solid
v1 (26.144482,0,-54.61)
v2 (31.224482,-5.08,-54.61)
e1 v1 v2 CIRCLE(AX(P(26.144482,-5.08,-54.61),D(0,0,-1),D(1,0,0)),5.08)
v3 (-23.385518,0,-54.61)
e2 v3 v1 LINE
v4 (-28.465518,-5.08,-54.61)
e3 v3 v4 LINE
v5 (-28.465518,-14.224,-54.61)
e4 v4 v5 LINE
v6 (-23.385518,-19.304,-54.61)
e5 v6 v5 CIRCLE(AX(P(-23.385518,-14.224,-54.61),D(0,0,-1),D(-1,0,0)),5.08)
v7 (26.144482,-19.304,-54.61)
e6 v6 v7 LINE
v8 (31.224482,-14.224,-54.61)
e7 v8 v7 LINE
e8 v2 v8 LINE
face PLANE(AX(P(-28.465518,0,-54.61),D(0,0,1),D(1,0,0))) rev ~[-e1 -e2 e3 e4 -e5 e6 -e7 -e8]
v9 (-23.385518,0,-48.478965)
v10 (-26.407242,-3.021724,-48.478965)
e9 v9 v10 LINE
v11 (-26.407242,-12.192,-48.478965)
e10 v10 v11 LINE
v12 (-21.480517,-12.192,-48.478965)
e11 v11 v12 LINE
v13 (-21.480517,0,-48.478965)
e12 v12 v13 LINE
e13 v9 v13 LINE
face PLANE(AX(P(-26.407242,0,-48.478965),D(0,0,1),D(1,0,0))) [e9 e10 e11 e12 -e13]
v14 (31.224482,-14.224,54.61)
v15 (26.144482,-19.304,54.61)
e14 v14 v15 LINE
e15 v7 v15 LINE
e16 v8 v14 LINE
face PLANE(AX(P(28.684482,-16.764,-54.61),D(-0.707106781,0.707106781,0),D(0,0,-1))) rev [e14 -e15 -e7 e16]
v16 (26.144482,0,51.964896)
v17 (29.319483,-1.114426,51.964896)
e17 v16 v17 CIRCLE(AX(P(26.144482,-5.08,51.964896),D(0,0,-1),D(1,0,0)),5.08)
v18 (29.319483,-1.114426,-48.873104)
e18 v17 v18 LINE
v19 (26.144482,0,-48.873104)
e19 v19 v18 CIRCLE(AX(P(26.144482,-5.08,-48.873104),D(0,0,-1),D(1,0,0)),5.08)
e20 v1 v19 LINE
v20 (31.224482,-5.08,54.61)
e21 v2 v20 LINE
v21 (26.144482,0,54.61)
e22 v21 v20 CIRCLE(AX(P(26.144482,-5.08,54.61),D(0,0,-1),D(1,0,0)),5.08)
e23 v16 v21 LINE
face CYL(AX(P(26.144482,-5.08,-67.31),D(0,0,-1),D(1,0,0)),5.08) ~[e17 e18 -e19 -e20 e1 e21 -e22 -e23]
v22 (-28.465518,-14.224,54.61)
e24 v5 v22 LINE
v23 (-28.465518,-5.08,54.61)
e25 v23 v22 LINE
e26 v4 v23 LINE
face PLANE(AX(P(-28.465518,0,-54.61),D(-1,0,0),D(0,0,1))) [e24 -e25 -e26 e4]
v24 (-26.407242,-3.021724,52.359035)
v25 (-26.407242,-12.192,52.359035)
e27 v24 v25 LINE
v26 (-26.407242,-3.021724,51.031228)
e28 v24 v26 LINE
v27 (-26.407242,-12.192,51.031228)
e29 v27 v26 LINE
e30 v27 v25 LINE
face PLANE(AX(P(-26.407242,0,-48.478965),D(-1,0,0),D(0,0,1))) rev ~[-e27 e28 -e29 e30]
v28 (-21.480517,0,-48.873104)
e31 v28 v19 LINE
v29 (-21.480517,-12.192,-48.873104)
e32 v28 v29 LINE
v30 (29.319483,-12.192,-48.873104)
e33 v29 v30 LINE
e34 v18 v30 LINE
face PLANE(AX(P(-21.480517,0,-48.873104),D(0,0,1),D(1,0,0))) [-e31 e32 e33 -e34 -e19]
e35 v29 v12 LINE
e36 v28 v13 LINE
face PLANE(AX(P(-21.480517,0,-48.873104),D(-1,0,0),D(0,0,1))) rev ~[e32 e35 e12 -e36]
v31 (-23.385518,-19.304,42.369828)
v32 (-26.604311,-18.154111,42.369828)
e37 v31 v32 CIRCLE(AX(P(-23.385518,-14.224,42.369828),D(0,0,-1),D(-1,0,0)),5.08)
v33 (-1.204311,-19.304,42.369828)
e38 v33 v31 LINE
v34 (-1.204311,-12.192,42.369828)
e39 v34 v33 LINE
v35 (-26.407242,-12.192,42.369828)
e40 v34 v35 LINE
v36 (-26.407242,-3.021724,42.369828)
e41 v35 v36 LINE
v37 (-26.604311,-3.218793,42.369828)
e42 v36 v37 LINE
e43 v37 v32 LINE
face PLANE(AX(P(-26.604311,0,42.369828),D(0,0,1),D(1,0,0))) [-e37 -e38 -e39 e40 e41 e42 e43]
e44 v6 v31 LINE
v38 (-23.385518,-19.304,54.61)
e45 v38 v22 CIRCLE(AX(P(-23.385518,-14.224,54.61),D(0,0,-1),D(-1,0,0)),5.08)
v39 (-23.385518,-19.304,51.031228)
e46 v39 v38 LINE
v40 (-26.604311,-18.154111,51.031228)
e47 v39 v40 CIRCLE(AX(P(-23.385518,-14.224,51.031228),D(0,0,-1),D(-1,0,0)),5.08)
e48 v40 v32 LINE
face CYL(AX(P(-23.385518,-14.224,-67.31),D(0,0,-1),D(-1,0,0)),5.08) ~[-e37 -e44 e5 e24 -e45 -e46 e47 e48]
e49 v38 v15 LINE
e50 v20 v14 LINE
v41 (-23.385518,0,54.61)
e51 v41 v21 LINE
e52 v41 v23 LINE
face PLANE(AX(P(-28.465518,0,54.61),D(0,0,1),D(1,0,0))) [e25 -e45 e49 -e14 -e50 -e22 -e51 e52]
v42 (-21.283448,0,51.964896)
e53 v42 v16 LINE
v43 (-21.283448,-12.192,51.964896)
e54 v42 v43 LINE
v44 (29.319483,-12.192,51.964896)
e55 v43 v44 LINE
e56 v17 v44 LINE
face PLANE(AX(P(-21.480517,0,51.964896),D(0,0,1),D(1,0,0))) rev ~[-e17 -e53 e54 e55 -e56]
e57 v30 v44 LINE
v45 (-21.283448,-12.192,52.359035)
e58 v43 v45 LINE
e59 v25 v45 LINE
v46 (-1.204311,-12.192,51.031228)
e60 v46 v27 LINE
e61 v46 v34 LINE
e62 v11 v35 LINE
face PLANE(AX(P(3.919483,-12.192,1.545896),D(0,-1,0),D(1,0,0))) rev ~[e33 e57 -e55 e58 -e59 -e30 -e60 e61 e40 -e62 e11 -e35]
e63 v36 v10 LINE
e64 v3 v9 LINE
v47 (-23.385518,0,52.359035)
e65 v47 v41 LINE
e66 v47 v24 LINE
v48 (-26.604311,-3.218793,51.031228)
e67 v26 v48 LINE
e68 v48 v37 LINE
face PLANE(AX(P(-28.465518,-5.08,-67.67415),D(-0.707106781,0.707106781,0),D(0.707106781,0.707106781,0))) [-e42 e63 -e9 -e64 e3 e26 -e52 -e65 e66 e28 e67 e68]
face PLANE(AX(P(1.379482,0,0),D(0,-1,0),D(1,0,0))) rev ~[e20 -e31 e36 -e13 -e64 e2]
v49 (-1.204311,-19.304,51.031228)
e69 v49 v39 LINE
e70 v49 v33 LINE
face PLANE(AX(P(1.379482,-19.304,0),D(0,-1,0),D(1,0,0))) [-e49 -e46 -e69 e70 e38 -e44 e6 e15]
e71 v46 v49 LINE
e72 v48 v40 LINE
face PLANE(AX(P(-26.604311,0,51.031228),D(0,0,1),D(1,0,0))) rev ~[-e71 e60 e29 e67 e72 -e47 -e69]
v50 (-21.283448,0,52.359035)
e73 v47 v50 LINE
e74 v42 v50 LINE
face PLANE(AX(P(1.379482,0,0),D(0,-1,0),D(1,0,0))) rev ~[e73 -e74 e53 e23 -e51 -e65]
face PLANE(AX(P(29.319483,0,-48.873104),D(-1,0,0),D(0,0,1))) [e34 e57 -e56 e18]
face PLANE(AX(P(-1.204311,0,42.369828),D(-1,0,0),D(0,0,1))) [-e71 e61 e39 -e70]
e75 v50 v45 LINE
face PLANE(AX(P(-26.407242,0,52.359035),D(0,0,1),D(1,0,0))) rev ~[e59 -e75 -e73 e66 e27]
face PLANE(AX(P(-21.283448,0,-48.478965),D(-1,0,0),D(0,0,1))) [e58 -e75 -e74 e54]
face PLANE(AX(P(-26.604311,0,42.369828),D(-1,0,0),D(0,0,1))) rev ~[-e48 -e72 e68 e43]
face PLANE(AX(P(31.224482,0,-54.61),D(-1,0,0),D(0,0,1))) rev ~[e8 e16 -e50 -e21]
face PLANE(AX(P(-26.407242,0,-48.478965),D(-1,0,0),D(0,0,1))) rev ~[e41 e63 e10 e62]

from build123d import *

# Parameters (mm, degrees)
F0_W         = 59.69
F0_H         = 109.22
F1_DEPTH     = 19.304
F2_W         = 50.8
F2_H         = 100.838
F3_DEPTH     = 12.192
F4_W         = 5.1237940788
F4_H         = 100.838
F5_DEPTH     = 12.192
F6_W         = 25.4
F6_H         = 8.6614
F7_DEPTH     = 45.974
F8_T1_DEPTH  = 134.62
F9_SIZE      = 5.08
F10_T1_DEPTH = 134.62
F11_T1_DEPTH = 135.3482991577


# Not quite as in the source:
# - a fillet or chamfer that OpenCascade refuses, or shapes differently, is made with other operations: its cross-section is extruded or revolved along the edge and cut away or added


with BuildPart() as f1:
    # F0 (on Front) → F1 (new body)
    with BuildSketch(Plane.XZ):
        with Locations((1.3794824481, 0)):
            Rectangle(F0_W, F0_H)
    extrude(amount=F1_DEPTH)

    # F2 (on Front) → F3 (cut)
    with BuildSketch(Plane.XZ):
        with Locations((3.9194825381, 1.5458958449)):
            Rectangle(F2_W, F2_H)
    extrude(amount=F3_DEPTH, mode=Mode.SUBTRACT)

    # F4 (on Front) → F5 (cut)
    with BuildSketch(Plane.XZ):
        with Locations((-23.8453447819, 1.9400352838)):
            Rectangle(F4_W, F4_H)
    extrude(amount=F5_DEPTH, mode=Mode.SUBTRACT)

    # F6 (on Front) → F7 (cut)
    with BuildSketch(Plane.XZ):
        with Locations((-13.9043106094, 46.7005276281)):
            Rectangle(F6_W, F6_H)
    extrude(amount=F7_DEPTH, mode=Mode.SUBTRACT)

    # F8: fillet of radius 5.08 on 1 edges, made by hand

    # F8_s2 → F8_t1 (cut)
    with BuildSketch(Plane.XY.offset(-67.31)):
        with BuildLine():
            ThreePointArc((-28.4655175519, -14.224), (-26.9776200003, -17.8161024484), (-23.3855175519, -19.304))
            Line((-23.3855175519, -19.304), (-28.4655175519, -19.304))
            Line((-28.4655175519, -19.304), (-28.4655175519, -14.224))
        make_face()
    extrude(amount=F8_T1_DEPTH, mode=Mode.SUBTRACT)

    # F9
    f9_edges = [f1.edges().sort_by_distance(p)[0] for p in [
        (31.224482, -19.304, 0),
    ]]
    chamfer(f9_edges, length=F9_SIZE)

    # F10: fillet of radius 5.08 on 1 edges, made by hand

    # F10_s2 → F10_t1 (cut)
    with BuildSketch(Plane.XY.offset(-67.31)):
        with BuildLine():
            ThreePointArc((31.2244824481, -5.08), (29.7365848965, -1.4878975516), (26.1444824481, 0))
            Line((26.1444824481, 0), (31.2244824481, 0))
            Line((31.2244824481, 0), (31.2244824481, -5.08))
        make_face()
    extrude(amount=F10_T1_DEPTH, mode=Mode.SUBTRACT)

    # F11: chamfer of 5.08 on 1 edges, made by hand

    # F11_s2 → F11_t1 (cut)
    with BuildSketch(Plane.XY.offset(-67.6741495789)):
        Polygon((-28.4655175519, -5.08), (-23.3855175519, 0), (-28.4655175519, 0), align=None)
    extrude(amount=F11_T1_DEPTH, mode=Mode.SUBTRACT)


solid = f1.part
